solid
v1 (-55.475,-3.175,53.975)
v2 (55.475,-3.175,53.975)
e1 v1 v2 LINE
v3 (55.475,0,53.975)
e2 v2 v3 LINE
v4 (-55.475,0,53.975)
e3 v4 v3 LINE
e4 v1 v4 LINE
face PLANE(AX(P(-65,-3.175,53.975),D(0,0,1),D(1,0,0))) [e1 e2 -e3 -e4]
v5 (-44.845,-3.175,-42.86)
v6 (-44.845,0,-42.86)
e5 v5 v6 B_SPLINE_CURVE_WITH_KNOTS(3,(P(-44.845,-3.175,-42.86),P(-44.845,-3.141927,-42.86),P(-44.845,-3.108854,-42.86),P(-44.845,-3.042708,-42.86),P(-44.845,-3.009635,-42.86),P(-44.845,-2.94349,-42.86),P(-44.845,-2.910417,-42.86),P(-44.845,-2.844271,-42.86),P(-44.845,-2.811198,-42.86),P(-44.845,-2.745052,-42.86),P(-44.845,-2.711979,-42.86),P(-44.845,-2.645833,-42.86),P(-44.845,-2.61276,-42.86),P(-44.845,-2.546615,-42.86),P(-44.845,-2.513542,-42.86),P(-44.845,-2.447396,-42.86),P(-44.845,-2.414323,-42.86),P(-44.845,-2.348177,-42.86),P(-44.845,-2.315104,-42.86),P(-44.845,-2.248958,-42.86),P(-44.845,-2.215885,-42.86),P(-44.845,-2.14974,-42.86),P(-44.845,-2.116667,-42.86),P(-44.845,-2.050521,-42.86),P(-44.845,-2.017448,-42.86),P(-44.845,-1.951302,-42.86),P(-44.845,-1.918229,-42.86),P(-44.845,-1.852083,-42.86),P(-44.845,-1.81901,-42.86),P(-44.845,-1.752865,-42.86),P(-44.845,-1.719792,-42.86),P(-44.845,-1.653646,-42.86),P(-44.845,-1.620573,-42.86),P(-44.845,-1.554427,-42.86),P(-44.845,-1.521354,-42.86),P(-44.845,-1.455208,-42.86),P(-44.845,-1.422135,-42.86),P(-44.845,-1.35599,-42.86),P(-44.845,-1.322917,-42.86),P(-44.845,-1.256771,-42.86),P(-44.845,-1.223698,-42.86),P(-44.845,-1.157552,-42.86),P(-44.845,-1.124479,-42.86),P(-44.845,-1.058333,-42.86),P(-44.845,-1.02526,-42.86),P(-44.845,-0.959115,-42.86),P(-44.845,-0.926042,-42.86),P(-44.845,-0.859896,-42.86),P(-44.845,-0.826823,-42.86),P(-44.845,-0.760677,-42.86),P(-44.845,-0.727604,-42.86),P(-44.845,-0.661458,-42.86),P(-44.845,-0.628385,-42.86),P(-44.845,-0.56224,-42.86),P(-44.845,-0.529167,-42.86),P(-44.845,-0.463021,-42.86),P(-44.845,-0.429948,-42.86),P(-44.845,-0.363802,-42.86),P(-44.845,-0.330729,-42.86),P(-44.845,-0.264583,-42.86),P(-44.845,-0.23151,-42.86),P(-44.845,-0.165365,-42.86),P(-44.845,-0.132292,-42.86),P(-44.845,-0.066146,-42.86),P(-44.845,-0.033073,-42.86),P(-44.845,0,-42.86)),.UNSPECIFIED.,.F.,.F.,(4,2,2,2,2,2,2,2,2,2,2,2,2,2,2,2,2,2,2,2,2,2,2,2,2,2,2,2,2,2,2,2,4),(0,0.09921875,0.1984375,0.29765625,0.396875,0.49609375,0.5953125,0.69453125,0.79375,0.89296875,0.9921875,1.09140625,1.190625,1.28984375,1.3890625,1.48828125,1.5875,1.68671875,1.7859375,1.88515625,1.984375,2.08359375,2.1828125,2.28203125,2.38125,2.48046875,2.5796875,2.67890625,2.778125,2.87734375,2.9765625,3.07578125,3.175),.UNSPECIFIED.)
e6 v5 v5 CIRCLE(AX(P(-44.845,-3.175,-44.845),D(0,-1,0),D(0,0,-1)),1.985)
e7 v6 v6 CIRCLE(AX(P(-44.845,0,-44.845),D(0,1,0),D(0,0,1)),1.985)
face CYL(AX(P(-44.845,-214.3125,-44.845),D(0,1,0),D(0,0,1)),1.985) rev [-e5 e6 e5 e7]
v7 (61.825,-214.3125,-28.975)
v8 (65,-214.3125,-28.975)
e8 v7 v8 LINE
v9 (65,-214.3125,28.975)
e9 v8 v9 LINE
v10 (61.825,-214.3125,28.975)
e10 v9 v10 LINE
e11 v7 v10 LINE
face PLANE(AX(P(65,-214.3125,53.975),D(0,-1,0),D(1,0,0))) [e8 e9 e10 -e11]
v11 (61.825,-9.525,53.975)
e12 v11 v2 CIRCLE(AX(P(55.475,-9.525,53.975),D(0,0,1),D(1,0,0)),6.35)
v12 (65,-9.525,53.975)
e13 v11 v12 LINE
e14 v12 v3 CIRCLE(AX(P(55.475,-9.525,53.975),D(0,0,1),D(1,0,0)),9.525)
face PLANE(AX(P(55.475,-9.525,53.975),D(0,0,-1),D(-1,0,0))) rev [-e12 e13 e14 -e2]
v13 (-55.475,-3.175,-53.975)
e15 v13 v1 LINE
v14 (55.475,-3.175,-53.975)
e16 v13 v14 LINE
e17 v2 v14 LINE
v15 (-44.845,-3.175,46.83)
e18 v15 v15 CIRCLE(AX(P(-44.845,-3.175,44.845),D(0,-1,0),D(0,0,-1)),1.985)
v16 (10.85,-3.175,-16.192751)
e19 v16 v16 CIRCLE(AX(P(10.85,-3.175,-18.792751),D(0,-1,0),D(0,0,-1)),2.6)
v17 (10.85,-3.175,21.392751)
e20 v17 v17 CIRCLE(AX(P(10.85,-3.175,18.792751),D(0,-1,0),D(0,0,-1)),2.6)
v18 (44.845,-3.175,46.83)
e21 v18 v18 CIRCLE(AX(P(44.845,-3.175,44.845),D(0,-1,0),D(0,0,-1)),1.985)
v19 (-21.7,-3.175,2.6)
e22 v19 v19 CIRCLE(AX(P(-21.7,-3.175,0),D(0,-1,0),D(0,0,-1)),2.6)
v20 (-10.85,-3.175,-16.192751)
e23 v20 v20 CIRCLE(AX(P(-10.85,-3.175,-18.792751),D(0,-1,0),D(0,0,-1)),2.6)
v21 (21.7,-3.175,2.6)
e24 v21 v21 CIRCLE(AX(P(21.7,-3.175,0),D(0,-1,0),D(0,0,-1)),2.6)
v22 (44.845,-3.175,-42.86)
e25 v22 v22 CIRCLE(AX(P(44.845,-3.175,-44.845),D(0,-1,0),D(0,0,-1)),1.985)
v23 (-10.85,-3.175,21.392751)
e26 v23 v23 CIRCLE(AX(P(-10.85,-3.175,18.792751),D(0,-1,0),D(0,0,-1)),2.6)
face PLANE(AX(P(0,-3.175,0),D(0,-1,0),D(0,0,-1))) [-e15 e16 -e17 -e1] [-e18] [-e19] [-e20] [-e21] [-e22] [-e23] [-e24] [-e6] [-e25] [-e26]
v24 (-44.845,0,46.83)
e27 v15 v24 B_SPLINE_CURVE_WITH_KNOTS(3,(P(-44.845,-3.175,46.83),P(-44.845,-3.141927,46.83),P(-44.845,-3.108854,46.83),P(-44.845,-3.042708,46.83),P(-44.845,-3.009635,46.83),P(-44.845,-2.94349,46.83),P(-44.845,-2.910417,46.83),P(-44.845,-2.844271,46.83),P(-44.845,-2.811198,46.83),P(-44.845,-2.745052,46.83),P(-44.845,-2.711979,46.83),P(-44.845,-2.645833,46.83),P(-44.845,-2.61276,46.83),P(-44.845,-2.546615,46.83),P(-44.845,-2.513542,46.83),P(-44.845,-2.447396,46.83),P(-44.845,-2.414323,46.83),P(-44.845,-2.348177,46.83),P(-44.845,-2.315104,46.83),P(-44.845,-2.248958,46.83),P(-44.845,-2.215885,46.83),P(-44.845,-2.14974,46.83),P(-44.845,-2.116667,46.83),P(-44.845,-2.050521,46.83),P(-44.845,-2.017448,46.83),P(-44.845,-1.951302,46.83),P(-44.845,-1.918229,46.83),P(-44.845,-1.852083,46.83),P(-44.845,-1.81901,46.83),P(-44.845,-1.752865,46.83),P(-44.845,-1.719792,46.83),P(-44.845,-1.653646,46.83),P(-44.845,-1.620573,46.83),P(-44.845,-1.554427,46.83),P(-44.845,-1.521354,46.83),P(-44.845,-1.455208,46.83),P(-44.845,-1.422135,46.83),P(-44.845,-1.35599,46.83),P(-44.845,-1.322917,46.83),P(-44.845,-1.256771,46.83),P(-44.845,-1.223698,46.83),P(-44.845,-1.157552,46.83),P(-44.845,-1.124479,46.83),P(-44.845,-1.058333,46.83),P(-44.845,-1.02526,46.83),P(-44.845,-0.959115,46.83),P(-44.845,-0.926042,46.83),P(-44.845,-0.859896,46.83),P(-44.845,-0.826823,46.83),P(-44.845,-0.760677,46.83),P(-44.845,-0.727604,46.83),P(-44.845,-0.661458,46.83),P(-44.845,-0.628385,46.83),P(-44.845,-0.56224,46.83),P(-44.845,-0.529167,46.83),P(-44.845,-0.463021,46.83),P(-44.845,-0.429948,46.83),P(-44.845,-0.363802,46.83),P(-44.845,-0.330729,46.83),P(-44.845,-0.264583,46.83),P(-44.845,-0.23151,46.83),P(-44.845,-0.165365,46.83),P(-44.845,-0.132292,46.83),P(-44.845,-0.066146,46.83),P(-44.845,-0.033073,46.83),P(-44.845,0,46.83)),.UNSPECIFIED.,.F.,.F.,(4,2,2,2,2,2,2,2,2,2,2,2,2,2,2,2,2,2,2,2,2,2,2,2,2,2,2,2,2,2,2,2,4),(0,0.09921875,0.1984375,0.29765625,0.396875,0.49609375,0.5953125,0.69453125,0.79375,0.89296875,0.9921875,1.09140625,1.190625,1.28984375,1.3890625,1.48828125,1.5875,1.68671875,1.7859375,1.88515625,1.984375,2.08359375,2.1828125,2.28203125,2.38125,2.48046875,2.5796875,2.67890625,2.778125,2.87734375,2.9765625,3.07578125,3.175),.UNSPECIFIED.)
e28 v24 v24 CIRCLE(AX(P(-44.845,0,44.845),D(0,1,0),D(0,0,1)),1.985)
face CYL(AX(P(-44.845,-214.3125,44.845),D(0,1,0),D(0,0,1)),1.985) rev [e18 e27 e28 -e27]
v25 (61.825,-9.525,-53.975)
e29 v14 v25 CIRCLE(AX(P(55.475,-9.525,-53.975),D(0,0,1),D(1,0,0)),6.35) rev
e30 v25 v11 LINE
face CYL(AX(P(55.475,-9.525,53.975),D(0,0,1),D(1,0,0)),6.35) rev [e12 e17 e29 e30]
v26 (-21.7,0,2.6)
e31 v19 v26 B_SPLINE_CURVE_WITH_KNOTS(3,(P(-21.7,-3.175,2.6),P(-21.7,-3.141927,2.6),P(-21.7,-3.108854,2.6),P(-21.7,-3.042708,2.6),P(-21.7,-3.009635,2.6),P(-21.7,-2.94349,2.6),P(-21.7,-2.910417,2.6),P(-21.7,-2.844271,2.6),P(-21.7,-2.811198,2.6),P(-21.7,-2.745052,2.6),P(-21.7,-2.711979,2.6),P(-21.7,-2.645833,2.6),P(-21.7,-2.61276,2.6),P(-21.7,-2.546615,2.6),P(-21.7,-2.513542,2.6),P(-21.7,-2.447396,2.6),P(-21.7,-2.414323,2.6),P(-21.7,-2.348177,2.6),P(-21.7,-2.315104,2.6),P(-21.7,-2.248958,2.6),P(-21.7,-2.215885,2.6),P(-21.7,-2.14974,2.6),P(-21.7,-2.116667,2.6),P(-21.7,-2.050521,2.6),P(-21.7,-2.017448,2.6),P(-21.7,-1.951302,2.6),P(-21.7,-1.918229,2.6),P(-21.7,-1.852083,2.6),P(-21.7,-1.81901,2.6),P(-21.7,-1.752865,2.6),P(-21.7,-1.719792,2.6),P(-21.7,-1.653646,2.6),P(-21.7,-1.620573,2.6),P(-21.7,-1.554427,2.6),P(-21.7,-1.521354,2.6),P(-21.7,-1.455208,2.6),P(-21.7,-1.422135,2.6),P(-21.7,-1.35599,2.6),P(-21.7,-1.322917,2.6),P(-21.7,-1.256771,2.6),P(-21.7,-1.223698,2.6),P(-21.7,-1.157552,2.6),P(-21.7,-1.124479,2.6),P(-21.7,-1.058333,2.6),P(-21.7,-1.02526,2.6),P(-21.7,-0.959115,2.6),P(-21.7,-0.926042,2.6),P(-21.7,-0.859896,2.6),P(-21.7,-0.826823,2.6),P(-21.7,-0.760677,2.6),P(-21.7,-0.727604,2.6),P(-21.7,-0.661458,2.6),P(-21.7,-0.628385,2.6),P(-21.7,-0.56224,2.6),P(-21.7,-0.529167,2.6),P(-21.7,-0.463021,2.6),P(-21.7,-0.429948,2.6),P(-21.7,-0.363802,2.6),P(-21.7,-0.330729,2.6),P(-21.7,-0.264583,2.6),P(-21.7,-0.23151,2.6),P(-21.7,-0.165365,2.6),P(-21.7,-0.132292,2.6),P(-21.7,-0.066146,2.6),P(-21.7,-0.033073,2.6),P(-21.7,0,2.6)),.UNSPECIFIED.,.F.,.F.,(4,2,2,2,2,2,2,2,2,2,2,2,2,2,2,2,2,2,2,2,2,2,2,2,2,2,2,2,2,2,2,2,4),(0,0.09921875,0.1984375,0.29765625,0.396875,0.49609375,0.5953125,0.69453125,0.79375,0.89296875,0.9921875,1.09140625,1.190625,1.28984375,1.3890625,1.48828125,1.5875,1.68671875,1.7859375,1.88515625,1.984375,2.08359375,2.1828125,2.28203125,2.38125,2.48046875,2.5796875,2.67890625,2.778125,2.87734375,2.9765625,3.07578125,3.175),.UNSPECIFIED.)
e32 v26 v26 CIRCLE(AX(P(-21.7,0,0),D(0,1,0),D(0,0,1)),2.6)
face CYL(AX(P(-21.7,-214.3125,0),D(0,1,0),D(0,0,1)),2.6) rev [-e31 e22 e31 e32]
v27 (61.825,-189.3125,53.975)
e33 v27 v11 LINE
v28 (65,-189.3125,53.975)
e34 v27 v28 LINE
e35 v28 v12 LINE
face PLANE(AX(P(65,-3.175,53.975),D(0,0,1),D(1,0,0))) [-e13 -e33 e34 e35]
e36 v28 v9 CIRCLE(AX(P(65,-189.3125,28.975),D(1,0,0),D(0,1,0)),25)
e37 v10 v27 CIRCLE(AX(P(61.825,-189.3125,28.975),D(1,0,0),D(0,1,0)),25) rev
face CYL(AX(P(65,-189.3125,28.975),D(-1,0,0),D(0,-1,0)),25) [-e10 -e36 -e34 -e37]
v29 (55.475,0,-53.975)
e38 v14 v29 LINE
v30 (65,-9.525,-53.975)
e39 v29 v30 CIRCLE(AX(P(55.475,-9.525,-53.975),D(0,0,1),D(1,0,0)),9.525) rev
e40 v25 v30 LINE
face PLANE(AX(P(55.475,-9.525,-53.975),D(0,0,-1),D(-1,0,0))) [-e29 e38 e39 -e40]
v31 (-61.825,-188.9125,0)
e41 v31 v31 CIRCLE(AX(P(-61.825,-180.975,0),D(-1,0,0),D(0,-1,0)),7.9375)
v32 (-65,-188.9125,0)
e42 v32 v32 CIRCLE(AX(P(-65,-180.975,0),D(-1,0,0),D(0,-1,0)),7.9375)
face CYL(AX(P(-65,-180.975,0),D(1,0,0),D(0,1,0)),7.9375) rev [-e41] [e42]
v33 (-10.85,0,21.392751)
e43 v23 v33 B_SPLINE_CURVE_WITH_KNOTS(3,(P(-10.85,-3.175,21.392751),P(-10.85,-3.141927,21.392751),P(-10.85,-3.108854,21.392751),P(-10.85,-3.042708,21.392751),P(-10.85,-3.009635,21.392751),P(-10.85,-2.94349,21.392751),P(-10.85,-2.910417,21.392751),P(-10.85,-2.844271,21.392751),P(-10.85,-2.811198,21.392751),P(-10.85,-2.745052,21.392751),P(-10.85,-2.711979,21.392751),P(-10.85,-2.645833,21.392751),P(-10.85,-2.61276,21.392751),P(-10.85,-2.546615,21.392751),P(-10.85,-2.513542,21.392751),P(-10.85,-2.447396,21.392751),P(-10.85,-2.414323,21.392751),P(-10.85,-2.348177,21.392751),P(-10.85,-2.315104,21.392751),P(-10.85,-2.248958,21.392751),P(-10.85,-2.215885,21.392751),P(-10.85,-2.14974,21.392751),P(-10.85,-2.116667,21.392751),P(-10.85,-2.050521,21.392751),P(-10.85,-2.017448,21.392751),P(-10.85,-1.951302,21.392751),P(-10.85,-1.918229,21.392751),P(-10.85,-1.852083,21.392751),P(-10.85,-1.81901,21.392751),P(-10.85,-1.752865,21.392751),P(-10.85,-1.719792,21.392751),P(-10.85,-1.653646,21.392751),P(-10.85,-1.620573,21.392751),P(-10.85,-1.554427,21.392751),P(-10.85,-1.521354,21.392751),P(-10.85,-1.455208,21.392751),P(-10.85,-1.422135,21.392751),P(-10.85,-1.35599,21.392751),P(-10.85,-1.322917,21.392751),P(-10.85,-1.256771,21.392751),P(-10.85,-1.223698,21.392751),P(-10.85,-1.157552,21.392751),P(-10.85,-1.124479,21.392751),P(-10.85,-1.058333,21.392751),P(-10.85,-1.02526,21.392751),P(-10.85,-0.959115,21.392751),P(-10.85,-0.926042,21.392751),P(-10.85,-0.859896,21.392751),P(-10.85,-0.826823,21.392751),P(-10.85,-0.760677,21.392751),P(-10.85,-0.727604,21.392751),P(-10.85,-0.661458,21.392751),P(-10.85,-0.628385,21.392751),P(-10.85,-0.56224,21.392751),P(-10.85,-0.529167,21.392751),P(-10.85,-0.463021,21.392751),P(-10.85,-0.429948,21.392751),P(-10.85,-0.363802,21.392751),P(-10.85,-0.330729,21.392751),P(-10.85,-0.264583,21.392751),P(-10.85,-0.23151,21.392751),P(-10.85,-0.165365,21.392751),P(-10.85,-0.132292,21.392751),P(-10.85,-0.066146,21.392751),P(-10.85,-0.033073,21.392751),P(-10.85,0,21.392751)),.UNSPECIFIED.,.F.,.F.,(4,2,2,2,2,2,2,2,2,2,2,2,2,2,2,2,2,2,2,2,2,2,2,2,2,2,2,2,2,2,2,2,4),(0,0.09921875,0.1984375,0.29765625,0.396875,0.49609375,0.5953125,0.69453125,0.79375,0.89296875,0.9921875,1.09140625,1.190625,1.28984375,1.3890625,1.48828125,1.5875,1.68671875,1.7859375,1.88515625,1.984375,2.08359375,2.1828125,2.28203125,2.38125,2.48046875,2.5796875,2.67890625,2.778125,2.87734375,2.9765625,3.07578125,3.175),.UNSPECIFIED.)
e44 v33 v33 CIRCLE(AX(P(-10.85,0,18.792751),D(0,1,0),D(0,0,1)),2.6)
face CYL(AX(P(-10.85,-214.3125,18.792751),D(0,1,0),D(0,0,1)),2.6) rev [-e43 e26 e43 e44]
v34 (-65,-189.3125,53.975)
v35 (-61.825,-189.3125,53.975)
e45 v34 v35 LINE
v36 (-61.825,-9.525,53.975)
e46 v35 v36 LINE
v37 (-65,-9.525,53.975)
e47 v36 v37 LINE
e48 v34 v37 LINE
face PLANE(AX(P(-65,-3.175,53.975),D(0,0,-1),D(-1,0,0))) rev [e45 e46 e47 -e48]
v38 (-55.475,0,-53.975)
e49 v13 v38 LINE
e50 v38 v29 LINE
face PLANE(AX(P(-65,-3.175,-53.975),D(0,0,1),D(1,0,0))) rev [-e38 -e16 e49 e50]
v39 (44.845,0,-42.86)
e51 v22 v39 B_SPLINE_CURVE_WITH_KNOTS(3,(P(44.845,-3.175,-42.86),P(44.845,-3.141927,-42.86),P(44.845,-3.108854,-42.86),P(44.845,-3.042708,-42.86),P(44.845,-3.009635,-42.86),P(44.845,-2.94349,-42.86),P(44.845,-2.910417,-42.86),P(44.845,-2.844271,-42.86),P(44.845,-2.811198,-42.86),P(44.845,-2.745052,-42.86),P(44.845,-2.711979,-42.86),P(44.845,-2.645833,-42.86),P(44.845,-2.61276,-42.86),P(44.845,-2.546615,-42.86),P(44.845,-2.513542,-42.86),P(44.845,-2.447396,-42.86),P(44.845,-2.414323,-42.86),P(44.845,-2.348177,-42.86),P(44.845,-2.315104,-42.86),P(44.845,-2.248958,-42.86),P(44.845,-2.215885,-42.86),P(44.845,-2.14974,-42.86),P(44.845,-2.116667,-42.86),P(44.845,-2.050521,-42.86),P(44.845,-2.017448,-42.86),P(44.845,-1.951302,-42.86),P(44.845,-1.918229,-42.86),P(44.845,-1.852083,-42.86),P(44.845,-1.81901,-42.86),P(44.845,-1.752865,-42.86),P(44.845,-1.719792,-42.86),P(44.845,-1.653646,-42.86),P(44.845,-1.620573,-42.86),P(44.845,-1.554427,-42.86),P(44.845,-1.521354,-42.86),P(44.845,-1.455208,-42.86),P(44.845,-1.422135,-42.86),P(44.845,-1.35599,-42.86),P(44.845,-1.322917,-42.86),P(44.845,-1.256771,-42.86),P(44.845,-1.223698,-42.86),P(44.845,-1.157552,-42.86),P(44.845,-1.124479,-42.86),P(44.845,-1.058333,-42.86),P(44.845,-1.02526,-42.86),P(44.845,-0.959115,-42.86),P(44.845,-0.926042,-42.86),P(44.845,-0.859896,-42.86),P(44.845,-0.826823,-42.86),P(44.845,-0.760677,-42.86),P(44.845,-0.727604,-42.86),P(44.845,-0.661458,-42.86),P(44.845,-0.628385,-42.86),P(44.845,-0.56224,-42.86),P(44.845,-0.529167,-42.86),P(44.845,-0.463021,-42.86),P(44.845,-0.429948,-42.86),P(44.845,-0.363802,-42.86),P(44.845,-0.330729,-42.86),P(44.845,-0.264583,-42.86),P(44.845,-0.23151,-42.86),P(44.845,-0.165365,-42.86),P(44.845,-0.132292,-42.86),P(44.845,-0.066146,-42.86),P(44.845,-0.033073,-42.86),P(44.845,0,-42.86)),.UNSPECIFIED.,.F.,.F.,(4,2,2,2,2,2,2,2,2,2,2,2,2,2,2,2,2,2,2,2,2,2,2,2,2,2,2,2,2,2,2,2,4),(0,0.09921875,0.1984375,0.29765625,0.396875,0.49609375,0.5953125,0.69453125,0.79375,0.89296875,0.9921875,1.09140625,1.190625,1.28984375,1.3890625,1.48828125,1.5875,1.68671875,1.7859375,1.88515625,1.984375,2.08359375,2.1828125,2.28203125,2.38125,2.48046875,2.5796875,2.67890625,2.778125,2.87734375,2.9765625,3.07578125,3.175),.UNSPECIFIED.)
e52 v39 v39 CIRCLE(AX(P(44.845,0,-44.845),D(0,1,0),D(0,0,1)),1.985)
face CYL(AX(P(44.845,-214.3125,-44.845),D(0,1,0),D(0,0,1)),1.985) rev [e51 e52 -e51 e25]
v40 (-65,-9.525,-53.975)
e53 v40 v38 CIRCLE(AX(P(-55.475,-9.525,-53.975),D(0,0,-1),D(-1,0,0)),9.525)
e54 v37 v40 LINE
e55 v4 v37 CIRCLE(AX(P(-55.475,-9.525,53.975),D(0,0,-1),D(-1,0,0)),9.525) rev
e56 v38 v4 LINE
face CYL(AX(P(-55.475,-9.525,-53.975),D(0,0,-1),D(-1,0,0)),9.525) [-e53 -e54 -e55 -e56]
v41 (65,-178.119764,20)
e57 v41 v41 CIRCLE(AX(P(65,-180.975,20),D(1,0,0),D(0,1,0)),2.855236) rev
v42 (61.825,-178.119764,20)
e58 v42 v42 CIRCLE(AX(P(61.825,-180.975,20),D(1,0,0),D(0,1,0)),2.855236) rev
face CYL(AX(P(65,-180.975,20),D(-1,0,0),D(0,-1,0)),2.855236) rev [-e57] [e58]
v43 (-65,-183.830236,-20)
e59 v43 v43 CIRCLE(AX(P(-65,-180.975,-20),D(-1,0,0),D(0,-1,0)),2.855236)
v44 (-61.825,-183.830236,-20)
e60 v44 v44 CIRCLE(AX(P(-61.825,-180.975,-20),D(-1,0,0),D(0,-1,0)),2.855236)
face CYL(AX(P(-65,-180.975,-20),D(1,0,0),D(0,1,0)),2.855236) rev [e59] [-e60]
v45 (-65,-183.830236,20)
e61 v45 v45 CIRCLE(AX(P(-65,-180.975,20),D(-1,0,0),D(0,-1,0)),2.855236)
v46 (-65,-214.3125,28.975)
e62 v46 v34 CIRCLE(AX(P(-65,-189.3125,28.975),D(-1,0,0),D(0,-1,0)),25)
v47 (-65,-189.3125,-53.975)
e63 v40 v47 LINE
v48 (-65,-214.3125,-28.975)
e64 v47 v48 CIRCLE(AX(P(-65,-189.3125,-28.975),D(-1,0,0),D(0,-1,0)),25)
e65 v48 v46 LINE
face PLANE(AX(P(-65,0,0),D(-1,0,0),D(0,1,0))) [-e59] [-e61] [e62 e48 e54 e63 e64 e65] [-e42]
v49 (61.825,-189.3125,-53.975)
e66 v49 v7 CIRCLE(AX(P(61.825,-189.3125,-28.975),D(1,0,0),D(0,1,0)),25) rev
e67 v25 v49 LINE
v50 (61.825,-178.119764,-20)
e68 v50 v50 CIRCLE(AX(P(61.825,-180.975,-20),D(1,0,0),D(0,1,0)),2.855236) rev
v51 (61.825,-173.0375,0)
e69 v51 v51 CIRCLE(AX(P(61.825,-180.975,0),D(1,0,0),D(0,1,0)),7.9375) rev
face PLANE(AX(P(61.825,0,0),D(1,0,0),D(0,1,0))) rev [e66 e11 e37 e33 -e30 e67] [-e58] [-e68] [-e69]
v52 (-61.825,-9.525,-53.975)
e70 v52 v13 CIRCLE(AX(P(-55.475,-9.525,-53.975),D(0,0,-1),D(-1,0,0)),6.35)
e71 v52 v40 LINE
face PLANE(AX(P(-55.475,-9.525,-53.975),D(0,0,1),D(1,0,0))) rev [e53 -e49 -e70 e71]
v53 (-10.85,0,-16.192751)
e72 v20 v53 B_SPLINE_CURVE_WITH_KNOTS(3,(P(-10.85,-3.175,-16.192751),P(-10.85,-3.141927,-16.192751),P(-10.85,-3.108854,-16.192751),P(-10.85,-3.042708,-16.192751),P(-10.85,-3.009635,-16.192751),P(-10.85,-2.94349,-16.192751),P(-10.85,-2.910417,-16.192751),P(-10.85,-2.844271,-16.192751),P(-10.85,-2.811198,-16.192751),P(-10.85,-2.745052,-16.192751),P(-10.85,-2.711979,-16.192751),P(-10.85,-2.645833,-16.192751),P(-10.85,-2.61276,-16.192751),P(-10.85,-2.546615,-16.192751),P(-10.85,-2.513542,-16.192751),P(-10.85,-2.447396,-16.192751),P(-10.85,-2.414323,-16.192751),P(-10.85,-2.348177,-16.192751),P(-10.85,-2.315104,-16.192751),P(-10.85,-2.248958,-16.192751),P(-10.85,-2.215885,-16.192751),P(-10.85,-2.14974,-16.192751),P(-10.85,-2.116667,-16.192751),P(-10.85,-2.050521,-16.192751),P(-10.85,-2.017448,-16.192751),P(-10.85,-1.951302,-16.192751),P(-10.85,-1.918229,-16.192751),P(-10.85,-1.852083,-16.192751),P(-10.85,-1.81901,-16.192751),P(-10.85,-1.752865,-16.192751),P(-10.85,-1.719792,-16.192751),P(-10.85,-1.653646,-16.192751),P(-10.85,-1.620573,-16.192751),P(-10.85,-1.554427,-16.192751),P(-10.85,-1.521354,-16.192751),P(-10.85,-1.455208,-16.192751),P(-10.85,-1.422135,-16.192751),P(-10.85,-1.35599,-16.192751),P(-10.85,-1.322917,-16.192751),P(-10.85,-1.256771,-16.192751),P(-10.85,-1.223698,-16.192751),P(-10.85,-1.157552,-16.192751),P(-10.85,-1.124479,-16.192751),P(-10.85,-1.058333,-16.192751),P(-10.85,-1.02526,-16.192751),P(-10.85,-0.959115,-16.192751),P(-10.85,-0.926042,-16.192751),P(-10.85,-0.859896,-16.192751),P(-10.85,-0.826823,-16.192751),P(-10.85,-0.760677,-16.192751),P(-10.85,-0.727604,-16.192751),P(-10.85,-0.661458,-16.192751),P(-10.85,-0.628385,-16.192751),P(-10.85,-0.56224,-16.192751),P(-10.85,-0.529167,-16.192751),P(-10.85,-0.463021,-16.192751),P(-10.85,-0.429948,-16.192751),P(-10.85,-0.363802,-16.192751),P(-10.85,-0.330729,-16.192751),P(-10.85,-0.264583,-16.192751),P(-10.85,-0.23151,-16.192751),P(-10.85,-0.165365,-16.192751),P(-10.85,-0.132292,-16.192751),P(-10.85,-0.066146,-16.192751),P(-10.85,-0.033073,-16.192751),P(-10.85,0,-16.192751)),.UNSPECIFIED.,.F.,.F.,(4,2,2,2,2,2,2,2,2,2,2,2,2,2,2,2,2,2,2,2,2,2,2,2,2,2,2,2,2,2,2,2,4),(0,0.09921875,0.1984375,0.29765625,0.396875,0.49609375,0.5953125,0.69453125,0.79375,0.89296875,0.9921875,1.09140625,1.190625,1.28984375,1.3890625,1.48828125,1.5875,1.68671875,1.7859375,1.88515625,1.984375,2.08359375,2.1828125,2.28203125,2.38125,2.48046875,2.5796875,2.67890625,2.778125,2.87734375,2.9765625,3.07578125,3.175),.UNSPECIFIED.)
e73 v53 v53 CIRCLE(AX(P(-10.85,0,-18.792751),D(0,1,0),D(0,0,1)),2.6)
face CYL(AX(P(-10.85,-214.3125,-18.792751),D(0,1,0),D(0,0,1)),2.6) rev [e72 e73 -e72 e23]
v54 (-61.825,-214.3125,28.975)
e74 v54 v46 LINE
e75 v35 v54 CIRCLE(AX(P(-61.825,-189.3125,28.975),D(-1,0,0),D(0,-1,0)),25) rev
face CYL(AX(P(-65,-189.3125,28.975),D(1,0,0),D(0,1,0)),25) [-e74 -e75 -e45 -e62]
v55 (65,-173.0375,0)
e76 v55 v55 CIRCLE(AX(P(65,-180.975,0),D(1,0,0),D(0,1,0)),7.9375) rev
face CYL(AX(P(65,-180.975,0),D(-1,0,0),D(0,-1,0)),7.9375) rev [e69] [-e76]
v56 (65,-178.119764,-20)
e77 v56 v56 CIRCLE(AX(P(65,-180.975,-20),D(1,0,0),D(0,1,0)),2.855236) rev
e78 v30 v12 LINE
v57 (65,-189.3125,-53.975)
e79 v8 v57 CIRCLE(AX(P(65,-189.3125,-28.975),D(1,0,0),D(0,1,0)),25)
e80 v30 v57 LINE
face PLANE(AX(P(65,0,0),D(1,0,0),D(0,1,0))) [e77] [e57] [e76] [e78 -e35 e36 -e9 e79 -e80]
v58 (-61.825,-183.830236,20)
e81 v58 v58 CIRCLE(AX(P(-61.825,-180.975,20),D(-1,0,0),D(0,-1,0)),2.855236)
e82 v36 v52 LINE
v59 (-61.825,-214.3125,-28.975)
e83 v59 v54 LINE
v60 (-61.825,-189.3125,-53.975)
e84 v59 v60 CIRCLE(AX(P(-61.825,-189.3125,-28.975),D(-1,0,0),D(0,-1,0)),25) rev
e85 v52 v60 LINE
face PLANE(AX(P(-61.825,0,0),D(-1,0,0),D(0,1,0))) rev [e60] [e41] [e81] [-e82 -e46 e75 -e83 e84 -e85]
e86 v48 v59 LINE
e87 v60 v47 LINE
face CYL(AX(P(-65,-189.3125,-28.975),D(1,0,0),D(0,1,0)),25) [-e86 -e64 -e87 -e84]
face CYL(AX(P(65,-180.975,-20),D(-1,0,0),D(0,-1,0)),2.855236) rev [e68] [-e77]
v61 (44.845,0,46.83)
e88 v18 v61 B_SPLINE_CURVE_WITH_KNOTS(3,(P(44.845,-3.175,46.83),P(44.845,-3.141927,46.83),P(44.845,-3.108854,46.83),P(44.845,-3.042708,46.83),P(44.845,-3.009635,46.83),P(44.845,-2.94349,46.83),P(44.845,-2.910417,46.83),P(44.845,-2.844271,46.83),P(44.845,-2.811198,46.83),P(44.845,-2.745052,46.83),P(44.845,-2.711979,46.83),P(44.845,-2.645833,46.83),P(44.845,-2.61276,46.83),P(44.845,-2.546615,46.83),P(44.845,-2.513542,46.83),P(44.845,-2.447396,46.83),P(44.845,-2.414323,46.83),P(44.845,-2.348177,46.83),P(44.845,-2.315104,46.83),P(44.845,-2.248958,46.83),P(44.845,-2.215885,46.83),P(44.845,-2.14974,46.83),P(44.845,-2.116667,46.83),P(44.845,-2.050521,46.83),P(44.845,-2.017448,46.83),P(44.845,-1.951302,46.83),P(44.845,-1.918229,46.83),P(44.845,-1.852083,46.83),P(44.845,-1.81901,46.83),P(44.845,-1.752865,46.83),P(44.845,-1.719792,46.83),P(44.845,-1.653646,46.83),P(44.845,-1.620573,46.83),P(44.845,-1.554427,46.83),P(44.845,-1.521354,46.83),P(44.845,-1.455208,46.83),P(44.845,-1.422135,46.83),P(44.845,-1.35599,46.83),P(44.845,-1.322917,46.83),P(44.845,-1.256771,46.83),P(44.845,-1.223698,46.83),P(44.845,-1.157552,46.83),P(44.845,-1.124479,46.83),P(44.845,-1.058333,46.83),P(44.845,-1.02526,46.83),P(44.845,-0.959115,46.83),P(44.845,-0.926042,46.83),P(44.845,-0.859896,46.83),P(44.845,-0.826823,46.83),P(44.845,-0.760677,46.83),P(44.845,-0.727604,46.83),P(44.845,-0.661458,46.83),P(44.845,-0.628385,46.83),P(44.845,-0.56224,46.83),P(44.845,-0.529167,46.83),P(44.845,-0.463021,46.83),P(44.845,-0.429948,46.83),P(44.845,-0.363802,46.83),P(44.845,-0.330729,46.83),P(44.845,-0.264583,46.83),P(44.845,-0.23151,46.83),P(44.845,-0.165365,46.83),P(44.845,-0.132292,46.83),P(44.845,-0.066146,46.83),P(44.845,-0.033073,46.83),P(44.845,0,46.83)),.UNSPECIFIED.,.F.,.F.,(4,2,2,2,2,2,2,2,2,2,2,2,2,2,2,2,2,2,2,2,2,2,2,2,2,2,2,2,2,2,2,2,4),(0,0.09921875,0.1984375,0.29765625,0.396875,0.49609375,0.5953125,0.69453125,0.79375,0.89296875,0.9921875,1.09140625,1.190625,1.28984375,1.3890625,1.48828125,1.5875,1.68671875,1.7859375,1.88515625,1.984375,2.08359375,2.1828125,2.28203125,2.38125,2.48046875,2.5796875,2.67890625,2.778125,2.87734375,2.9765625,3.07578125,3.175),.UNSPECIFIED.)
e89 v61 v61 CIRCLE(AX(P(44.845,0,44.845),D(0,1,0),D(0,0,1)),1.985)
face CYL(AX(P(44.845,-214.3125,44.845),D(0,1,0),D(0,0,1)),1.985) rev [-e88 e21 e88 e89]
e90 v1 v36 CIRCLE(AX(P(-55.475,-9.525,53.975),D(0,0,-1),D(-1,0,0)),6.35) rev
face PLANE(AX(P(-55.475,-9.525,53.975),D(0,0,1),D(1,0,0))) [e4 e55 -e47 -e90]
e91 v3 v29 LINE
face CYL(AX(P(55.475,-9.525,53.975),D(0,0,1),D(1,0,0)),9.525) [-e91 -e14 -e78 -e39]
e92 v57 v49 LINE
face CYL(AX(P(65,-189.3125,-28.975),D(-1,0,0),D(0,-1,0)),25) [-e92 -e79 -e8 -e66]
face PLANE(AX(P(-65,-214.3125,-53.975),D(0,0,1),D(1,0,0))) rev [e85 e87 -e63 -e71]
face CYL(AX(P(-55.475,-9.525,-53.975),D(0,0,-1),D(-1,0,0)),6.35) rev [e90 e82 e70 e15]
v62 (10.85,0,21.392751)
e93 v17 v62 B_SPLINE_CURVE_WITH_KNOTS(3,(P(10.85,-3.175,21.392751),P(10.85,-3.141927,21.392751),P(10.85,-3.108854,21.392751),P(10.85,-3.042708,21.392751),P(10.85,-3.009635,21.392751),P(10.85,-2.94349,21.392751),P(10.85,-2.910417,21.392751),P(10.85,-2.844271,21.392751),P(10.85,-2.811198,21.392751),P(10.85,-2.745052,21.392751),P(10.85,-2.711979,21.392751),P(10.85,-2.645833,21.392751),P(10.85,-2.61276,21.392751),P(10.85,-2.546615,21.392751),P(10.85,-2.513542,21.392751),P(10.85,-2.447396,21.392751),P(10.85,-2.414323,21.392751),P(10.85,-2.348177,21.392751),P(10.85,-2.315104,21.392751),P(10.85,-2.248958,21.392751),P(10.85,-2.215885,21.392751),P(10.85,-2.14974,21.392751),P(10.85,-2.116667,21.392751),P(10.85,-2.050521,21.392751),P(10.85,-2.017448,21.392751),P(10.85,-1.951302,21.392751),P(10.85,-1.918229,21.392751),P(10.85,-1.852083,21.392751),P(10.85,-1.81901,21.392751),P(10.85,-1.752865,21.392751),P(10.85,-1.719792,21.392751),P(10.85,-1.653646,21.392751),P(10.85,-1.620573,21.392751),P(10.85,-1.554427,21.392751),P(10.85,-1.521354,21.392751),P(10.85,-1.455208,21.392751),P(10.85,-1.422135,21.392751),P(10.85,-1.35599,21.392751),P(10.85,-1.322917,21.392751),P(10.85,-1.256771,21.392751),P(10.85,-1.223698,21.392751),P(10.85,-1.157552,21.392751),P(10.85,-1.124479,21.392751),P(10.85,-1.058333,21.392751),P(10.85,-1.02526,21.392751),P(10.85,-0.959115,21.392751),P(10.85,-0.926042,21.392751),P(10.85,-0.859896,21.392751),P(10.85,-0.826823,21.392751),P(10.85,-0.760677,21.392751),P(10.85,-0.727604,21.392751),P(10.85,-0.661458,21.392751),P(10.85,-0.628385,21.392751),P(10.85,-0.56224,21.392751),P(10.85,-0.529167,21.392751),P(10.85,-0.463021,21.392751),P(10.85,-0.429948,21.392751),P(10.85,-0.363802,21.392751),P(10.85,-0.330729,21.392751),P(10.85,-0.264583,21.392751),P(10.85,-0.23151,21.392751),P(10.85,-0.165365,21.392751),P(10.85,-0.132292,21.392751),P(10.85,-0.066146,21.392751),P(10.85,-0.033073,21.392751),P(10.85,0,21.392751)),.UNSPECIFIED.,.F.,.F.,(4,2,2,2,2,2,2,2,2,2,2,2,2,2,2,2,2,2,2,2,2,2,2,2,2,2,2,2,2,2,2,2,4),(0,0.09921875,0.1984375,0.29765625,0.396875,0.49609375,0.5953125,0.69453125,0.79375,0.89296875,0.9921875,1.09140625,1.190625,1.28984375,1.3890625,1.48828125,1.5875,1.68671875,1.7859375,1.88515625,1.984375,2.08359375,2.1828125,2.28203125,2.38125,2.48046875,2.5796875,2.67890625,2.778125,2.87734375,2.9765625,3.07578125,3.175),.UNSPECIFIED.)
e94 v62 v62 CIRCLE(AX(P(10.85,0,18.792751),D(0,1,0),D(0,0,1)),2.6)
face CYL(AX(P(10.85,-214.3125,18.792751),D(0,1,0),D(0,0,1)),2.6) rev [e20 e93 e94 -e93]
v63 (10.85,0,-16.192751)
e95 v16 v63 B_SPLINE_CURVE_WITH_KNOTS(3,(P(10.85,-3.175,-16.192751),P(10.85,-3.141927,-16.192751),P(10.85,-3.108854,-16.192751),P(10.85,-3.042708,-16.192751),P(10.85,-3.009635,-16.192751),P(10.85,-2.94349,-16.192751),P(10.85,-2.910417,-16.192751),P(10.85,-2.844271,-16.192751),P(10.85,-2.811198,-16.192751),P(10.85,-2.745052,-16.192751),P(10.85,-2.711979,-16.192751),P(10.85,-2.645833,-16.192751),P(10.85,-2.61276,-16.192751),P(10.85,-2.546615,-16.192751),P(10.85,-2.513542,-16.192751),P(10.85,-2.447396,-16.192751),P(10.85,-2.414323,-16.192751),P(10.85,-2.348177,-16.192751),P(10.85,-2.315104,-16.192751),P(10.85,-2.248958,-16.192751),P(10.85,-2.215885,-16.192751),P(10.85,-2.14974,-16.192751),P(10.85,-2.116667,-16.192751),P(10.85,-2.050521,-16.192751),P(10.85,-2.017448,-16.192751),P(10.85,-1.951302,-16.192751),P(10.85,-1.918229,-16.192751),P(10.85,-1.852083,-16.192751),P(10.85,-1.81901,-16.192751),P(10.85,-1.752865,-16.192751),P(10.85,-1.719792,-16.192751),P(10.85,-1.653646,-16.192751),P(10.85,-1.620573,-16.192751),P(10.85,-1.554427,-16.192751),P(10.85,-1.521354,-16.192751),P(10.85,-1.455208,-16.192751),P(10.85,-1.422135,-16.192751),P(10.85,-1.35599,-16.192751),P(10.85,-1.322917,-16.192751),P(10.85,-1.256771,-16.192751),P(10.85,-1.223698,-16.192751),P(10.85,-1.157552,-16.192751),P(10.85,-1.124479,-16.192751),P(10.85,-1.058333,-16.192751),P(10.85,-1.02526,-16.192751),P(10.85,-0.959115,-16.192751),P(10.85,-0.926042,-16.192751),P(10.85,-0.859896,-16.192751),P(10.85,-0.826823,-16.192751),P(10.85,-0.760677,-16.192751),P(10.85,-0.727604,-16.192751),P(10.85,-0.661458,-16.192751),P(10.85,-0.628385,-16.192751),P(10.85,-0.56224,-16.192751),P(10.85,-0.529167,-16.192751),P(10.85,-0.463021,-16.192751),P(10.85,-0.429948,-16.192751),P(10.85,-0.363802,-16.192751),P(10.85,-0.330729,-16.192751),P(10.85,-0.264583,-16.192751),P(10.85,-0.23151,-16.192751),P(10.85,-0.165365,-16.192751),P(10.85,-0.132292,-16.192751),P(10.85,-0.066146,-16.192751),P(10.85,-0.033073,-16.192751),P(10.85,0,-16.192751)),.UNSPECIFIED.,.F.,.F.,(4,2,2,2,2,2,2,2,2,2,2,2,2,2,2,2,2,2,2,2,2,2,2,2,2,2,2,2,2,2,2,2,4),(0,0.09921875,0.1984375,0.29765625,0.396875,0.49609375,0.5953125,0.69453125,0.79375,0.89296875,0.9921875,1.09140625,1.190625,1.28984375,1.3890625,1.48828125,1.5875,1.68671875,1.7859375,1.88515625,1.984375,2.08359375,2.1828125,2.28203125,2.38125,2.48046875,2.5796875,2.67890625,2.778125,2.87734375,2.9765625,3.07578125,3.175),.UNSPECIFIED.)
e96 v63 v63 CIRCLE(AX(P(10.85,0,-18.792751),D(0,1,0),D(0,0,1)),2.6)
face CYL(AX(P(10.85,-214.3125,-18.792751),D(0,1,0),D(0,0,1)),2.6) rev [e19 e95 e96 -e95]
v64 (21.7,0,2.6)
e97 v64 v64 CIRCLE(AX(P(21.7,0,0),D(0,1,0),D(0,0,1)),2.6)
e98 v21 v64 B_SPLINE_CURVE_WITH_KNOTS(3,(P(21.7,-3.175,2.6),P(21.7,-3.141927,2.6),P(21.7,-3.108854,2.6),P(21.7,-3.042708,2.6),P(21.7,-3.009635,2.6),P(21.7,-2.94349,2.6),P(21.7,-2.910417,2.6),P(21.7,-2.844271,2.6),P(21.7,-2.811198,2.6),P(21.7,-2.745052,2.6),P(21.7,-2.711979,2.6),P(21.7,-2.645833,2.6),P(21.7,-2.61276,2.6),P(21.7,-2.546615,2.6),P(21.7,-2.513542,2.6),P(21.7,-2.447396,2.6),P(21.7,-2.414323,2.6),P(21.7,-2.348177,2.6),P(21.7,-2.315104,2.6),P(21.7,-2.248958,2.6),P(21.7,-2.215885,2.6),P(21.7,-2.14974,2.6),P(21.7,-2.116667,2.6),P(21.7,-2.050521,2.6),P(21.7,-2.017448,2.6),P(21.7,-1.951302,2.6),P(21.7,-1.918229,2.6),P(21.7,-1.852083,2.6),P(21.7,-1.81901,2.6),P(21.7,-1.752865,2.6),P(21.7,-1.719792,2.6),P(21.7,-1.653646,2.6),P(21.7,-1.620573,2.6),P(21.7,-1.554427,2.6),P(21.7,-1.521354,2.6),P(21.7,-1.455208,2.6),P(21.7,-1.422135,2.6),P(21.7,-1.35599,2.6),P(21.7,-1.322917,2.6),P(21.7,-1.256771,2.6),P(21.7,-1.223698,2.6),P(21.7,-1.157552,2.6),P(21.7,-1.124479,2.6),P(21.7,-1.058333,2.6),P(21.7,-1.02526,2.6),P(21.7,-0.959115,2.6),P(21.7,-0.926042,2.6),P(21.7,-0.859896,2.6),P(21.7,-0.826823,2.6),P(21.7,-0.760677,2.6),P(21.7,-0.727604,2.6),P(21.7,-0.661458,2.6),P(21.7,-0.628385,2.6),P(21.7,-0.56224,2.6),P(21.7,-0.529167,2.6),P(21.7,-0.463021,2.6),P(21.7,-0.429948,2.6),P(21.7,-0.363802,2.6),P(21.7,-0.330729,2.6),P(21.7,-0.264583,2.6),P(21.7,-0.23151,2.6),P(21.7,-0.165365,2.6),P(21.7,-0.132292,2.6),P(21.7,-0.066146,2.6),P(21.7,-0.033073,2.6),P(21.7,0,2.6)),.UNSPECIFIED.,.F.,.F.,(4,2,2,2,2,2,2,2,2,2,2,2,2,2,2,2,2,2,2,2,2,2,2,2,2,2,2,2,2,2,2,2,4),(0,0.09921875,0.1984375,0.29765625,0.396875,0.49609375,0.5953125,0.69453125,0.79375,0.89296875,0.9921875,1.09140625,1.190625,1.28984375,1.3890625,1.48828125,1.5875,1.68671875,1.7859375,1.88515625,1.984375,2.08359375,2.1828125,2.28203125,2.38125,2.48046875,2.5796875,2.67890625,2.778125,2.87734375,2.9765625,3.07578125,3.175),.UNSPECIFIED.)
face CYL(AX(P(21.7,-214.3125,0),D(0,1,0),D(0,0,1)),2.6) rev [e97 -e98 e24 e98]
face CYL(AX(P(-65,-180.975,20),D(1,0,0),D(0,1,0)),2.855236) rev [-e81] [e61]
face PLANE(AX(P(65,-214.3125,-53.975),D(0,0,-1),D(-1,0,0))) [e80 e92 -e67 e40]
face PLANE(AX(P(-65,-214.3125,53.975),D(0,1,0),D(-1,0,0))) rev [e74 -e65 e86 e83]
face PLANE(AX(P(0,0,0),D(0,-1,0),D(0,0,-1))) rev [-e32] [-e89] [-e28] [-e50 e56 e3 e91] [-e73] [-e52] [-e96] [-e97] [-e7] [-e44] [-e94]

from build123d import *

# Parameters (mm, degrees)
SKETCH3_W                    = 130
SKETCH3_H                    = 107.95
BASE_FLANGE1_DEPTH           = 3.175
EDGE_FLANGE1_STRIP_W         = 25.4
EDGE_FLANGE1_STRIP_H         = 3.175
EDGE_FLANGE1_STRIP_CUT_DEPTH = 107.95
EDGE_FLANGE1_DEPTH           = 107.95
EDGE_FLANGE1_PROFILE_W       = 107.95
EDGE_FLANGE1_PROFILE_H       = 204.7875
EDGE_FLANGE1_PROFILE_R       = 2.855235605
EDGE_FLANGE1_PROFILE_R_2     = 7.9375
EDGE_FLANGE1_FLAT_DEPTH      = 3.175
FILLET1_R                    = 25
SKETCH13_R                   = 2.6
FLANGE_COUPLING_HOLES_DEPTH  = 231.365249726
SKETCH15_R                   = 1.985
CUT_EXTRUDE1_DEPTH           = 231.365249726


# Sheet-metal steps are written as plain solids
with BuildPart() as part:
    # Sketch3 → Base-Flange1 (new body)
    with BuildSketch(Plane(origin=(0, 0, 0), x_dir=(1, 0, 0), z_dir=(0, 1, 0))):
        Rectangle(SKETCH3_W, SKETCH3_H)
    extrude(amount=-BASE_FLANGE1_DEPTH)

    # Edge-Flange1 strip (across the edge) → Edge-Flange1 strip cut (cut)
    with BuildSketch(Plane(origin=(65, -3.175, -53.975), x_dir=(-1, 0, 0), z_dir=(0, 0, 1))):
        with Locations((-3.175, -1.5875)):
            Rectangle(EDGE_FLANGE1_STRIP_W, EDGE_FLANGE1_STRIP_H)
    edge_flange1_strip_cut = extrude(amount=EDGE_FLANGE1_STRIP_CUT_DEPTH, mode=Mode.SUBTRACT)

    # Edge-Flange1 bend section (across the edge) → Edge-Flange1 (add)
    with BuildSketch(Plane(origin=(65, -3.175, -53.975), x_dir=(-1, 0, 0), z_dir=(0, 0, 1))):
        with BuildLine():
            Line((0, 6.35), (3.175, 6.35))
            ThreePointArc((3.175, 6.35), (5.034871939, 1.859871939), (9.525, 0))
            Line((9.525, 0), (9.525, -3.175))
            ThreePointArc((9.525, -3.175), (2.789807909, -0.385192091), (0, 6.35))
        make_face()
    edge_flange1 = extrude(amount=EDGE_FLANGE1_DEPTH)

    # Edge-Flange1 profile (on flange) → Edge-Flange1 flat (add)
    with BuildSketch(Plane(origin=(65, -3.175, 0), x_dir=(0, 0, -1), z_dir=(-1, 0, 0))):
        with Locations((0, 108.74375)):
            Rectangle(EDGE_FLANGE1_PROFILE_W, EDGE_FLANGE1_PROFILE_H)
        with Locations((20, 177.8)):
            Circle(EDGE_FLANGE1_PROFILE_R, mode=Mode.SUBTRACT)
        with Locations((0, 177.8)):
            Circle(EDGE_FLANGE1_PROFILE_R_2, mode=Mode.SUBTRACT)
        with Locations((-20, 177.8)):
            Circle(EDGE_FLANGE1_PROFILE_R, mode=Mode.SUBTRACT)
    edge_flange1_flat = extrude(amount=EDGE_FLANGE1_FLAT_DEPTH)

    # Mirror1: Edge-Flange1 strip cut, Edge-Flange1, Edge-Flange1 flat across plane
    add(edge_flange1_strip_cut.mirror(Plane(origin=(0, 0, 0), x_dir=(0, 0, 1), z_dir=(1, 0, 0))), mode=Mode.SUBTRACT)
    add(edge_flange1.mirror(Plane(origin=(0, 0, 0), x_dir=(0, 0, 1), z_dir=(1, 0, 0))))
    add(edge_flange1_flat.mirror(Plane(origin=(0, 0, 0), x_dir=(0, 0, 1), z_dir=(1, 0, 0))))

    # Fillet1
    fillet1_edges = [part.edges().sort_by_distance(p)[0] for p in [
        (-63.4125, -214.3125, -53.975),
        (63.4125, -214.3125, -53.975),
        (63.4125, -214.3125, 53.975),
        (-63.4125, -214.3125, 53.975),
    ]]
    fillet(fillet1_edges, radius=FILLET1_R)

    # Sketch13 → Flange Coupling Holes (cut, through all)
    with BuildSketch(Plane(origin=(0, 0, 0), x_dir=(1, 0, 0), z_dir=(0, 1, 0))):
        with Locations(Location((-21.7, 0, 0), (0, 0, 270))):
            Circle(SKETCH13_R)
        with Locations(Location((-10.85, 18.792751262, 0), (0, 0, 270))):
            Circle(SKETCH13_R)
        with Locations(Location((10.85, 18.792751262, 0), (0, 0, 270))):
            Circle(SKETCH13_R)
        with Locations(Location((21.7, 0, 0), (0, 0, 270))):
            Circle(SKETCH13_R)
        with Locations(Location((10.85, -18.792751262, 0), (0, 0, 270))):
            Circle(SKETCH13_R)
        with Locations(Location((-10.85, -18.792751262, 0), (0, 0, 270))):
            Circle(SKETCH13_R)
    extrude(amount=-FLANGE_COUPLING_HOLES_DEPTH, mode=Mode.SUBTRACT)

    # Sketch15 → Cut-Extrude1 (cut, through all)
    with BuildSketch(Plane(origin=(0, 0, 0), x_dir=(1, 0, 0), z_dir=(0, 1, 0))):
        with Locations(Location((-44.845, 44.845, 0), (0, 0, 270))):
            Circle(SKETCH15_R)
        with Locations(Location((44.845, 44.845, 0), (0, 0, 270))):
            Circle(SKETCH15_R)
        with Locations(Location((44.845, -44.845, 0), (0, 0, 270))):
            Circle(SKETCH15_R)
        with Locations(Location((-44.845, -44.845, 0), (0, 0, 270))):
            Circle(SKETCH15_R)
    extrude(amount=-CUT_EXTRUDE1_DEPTH, mode=Mode.SUBTRACT)


solid = part.part
